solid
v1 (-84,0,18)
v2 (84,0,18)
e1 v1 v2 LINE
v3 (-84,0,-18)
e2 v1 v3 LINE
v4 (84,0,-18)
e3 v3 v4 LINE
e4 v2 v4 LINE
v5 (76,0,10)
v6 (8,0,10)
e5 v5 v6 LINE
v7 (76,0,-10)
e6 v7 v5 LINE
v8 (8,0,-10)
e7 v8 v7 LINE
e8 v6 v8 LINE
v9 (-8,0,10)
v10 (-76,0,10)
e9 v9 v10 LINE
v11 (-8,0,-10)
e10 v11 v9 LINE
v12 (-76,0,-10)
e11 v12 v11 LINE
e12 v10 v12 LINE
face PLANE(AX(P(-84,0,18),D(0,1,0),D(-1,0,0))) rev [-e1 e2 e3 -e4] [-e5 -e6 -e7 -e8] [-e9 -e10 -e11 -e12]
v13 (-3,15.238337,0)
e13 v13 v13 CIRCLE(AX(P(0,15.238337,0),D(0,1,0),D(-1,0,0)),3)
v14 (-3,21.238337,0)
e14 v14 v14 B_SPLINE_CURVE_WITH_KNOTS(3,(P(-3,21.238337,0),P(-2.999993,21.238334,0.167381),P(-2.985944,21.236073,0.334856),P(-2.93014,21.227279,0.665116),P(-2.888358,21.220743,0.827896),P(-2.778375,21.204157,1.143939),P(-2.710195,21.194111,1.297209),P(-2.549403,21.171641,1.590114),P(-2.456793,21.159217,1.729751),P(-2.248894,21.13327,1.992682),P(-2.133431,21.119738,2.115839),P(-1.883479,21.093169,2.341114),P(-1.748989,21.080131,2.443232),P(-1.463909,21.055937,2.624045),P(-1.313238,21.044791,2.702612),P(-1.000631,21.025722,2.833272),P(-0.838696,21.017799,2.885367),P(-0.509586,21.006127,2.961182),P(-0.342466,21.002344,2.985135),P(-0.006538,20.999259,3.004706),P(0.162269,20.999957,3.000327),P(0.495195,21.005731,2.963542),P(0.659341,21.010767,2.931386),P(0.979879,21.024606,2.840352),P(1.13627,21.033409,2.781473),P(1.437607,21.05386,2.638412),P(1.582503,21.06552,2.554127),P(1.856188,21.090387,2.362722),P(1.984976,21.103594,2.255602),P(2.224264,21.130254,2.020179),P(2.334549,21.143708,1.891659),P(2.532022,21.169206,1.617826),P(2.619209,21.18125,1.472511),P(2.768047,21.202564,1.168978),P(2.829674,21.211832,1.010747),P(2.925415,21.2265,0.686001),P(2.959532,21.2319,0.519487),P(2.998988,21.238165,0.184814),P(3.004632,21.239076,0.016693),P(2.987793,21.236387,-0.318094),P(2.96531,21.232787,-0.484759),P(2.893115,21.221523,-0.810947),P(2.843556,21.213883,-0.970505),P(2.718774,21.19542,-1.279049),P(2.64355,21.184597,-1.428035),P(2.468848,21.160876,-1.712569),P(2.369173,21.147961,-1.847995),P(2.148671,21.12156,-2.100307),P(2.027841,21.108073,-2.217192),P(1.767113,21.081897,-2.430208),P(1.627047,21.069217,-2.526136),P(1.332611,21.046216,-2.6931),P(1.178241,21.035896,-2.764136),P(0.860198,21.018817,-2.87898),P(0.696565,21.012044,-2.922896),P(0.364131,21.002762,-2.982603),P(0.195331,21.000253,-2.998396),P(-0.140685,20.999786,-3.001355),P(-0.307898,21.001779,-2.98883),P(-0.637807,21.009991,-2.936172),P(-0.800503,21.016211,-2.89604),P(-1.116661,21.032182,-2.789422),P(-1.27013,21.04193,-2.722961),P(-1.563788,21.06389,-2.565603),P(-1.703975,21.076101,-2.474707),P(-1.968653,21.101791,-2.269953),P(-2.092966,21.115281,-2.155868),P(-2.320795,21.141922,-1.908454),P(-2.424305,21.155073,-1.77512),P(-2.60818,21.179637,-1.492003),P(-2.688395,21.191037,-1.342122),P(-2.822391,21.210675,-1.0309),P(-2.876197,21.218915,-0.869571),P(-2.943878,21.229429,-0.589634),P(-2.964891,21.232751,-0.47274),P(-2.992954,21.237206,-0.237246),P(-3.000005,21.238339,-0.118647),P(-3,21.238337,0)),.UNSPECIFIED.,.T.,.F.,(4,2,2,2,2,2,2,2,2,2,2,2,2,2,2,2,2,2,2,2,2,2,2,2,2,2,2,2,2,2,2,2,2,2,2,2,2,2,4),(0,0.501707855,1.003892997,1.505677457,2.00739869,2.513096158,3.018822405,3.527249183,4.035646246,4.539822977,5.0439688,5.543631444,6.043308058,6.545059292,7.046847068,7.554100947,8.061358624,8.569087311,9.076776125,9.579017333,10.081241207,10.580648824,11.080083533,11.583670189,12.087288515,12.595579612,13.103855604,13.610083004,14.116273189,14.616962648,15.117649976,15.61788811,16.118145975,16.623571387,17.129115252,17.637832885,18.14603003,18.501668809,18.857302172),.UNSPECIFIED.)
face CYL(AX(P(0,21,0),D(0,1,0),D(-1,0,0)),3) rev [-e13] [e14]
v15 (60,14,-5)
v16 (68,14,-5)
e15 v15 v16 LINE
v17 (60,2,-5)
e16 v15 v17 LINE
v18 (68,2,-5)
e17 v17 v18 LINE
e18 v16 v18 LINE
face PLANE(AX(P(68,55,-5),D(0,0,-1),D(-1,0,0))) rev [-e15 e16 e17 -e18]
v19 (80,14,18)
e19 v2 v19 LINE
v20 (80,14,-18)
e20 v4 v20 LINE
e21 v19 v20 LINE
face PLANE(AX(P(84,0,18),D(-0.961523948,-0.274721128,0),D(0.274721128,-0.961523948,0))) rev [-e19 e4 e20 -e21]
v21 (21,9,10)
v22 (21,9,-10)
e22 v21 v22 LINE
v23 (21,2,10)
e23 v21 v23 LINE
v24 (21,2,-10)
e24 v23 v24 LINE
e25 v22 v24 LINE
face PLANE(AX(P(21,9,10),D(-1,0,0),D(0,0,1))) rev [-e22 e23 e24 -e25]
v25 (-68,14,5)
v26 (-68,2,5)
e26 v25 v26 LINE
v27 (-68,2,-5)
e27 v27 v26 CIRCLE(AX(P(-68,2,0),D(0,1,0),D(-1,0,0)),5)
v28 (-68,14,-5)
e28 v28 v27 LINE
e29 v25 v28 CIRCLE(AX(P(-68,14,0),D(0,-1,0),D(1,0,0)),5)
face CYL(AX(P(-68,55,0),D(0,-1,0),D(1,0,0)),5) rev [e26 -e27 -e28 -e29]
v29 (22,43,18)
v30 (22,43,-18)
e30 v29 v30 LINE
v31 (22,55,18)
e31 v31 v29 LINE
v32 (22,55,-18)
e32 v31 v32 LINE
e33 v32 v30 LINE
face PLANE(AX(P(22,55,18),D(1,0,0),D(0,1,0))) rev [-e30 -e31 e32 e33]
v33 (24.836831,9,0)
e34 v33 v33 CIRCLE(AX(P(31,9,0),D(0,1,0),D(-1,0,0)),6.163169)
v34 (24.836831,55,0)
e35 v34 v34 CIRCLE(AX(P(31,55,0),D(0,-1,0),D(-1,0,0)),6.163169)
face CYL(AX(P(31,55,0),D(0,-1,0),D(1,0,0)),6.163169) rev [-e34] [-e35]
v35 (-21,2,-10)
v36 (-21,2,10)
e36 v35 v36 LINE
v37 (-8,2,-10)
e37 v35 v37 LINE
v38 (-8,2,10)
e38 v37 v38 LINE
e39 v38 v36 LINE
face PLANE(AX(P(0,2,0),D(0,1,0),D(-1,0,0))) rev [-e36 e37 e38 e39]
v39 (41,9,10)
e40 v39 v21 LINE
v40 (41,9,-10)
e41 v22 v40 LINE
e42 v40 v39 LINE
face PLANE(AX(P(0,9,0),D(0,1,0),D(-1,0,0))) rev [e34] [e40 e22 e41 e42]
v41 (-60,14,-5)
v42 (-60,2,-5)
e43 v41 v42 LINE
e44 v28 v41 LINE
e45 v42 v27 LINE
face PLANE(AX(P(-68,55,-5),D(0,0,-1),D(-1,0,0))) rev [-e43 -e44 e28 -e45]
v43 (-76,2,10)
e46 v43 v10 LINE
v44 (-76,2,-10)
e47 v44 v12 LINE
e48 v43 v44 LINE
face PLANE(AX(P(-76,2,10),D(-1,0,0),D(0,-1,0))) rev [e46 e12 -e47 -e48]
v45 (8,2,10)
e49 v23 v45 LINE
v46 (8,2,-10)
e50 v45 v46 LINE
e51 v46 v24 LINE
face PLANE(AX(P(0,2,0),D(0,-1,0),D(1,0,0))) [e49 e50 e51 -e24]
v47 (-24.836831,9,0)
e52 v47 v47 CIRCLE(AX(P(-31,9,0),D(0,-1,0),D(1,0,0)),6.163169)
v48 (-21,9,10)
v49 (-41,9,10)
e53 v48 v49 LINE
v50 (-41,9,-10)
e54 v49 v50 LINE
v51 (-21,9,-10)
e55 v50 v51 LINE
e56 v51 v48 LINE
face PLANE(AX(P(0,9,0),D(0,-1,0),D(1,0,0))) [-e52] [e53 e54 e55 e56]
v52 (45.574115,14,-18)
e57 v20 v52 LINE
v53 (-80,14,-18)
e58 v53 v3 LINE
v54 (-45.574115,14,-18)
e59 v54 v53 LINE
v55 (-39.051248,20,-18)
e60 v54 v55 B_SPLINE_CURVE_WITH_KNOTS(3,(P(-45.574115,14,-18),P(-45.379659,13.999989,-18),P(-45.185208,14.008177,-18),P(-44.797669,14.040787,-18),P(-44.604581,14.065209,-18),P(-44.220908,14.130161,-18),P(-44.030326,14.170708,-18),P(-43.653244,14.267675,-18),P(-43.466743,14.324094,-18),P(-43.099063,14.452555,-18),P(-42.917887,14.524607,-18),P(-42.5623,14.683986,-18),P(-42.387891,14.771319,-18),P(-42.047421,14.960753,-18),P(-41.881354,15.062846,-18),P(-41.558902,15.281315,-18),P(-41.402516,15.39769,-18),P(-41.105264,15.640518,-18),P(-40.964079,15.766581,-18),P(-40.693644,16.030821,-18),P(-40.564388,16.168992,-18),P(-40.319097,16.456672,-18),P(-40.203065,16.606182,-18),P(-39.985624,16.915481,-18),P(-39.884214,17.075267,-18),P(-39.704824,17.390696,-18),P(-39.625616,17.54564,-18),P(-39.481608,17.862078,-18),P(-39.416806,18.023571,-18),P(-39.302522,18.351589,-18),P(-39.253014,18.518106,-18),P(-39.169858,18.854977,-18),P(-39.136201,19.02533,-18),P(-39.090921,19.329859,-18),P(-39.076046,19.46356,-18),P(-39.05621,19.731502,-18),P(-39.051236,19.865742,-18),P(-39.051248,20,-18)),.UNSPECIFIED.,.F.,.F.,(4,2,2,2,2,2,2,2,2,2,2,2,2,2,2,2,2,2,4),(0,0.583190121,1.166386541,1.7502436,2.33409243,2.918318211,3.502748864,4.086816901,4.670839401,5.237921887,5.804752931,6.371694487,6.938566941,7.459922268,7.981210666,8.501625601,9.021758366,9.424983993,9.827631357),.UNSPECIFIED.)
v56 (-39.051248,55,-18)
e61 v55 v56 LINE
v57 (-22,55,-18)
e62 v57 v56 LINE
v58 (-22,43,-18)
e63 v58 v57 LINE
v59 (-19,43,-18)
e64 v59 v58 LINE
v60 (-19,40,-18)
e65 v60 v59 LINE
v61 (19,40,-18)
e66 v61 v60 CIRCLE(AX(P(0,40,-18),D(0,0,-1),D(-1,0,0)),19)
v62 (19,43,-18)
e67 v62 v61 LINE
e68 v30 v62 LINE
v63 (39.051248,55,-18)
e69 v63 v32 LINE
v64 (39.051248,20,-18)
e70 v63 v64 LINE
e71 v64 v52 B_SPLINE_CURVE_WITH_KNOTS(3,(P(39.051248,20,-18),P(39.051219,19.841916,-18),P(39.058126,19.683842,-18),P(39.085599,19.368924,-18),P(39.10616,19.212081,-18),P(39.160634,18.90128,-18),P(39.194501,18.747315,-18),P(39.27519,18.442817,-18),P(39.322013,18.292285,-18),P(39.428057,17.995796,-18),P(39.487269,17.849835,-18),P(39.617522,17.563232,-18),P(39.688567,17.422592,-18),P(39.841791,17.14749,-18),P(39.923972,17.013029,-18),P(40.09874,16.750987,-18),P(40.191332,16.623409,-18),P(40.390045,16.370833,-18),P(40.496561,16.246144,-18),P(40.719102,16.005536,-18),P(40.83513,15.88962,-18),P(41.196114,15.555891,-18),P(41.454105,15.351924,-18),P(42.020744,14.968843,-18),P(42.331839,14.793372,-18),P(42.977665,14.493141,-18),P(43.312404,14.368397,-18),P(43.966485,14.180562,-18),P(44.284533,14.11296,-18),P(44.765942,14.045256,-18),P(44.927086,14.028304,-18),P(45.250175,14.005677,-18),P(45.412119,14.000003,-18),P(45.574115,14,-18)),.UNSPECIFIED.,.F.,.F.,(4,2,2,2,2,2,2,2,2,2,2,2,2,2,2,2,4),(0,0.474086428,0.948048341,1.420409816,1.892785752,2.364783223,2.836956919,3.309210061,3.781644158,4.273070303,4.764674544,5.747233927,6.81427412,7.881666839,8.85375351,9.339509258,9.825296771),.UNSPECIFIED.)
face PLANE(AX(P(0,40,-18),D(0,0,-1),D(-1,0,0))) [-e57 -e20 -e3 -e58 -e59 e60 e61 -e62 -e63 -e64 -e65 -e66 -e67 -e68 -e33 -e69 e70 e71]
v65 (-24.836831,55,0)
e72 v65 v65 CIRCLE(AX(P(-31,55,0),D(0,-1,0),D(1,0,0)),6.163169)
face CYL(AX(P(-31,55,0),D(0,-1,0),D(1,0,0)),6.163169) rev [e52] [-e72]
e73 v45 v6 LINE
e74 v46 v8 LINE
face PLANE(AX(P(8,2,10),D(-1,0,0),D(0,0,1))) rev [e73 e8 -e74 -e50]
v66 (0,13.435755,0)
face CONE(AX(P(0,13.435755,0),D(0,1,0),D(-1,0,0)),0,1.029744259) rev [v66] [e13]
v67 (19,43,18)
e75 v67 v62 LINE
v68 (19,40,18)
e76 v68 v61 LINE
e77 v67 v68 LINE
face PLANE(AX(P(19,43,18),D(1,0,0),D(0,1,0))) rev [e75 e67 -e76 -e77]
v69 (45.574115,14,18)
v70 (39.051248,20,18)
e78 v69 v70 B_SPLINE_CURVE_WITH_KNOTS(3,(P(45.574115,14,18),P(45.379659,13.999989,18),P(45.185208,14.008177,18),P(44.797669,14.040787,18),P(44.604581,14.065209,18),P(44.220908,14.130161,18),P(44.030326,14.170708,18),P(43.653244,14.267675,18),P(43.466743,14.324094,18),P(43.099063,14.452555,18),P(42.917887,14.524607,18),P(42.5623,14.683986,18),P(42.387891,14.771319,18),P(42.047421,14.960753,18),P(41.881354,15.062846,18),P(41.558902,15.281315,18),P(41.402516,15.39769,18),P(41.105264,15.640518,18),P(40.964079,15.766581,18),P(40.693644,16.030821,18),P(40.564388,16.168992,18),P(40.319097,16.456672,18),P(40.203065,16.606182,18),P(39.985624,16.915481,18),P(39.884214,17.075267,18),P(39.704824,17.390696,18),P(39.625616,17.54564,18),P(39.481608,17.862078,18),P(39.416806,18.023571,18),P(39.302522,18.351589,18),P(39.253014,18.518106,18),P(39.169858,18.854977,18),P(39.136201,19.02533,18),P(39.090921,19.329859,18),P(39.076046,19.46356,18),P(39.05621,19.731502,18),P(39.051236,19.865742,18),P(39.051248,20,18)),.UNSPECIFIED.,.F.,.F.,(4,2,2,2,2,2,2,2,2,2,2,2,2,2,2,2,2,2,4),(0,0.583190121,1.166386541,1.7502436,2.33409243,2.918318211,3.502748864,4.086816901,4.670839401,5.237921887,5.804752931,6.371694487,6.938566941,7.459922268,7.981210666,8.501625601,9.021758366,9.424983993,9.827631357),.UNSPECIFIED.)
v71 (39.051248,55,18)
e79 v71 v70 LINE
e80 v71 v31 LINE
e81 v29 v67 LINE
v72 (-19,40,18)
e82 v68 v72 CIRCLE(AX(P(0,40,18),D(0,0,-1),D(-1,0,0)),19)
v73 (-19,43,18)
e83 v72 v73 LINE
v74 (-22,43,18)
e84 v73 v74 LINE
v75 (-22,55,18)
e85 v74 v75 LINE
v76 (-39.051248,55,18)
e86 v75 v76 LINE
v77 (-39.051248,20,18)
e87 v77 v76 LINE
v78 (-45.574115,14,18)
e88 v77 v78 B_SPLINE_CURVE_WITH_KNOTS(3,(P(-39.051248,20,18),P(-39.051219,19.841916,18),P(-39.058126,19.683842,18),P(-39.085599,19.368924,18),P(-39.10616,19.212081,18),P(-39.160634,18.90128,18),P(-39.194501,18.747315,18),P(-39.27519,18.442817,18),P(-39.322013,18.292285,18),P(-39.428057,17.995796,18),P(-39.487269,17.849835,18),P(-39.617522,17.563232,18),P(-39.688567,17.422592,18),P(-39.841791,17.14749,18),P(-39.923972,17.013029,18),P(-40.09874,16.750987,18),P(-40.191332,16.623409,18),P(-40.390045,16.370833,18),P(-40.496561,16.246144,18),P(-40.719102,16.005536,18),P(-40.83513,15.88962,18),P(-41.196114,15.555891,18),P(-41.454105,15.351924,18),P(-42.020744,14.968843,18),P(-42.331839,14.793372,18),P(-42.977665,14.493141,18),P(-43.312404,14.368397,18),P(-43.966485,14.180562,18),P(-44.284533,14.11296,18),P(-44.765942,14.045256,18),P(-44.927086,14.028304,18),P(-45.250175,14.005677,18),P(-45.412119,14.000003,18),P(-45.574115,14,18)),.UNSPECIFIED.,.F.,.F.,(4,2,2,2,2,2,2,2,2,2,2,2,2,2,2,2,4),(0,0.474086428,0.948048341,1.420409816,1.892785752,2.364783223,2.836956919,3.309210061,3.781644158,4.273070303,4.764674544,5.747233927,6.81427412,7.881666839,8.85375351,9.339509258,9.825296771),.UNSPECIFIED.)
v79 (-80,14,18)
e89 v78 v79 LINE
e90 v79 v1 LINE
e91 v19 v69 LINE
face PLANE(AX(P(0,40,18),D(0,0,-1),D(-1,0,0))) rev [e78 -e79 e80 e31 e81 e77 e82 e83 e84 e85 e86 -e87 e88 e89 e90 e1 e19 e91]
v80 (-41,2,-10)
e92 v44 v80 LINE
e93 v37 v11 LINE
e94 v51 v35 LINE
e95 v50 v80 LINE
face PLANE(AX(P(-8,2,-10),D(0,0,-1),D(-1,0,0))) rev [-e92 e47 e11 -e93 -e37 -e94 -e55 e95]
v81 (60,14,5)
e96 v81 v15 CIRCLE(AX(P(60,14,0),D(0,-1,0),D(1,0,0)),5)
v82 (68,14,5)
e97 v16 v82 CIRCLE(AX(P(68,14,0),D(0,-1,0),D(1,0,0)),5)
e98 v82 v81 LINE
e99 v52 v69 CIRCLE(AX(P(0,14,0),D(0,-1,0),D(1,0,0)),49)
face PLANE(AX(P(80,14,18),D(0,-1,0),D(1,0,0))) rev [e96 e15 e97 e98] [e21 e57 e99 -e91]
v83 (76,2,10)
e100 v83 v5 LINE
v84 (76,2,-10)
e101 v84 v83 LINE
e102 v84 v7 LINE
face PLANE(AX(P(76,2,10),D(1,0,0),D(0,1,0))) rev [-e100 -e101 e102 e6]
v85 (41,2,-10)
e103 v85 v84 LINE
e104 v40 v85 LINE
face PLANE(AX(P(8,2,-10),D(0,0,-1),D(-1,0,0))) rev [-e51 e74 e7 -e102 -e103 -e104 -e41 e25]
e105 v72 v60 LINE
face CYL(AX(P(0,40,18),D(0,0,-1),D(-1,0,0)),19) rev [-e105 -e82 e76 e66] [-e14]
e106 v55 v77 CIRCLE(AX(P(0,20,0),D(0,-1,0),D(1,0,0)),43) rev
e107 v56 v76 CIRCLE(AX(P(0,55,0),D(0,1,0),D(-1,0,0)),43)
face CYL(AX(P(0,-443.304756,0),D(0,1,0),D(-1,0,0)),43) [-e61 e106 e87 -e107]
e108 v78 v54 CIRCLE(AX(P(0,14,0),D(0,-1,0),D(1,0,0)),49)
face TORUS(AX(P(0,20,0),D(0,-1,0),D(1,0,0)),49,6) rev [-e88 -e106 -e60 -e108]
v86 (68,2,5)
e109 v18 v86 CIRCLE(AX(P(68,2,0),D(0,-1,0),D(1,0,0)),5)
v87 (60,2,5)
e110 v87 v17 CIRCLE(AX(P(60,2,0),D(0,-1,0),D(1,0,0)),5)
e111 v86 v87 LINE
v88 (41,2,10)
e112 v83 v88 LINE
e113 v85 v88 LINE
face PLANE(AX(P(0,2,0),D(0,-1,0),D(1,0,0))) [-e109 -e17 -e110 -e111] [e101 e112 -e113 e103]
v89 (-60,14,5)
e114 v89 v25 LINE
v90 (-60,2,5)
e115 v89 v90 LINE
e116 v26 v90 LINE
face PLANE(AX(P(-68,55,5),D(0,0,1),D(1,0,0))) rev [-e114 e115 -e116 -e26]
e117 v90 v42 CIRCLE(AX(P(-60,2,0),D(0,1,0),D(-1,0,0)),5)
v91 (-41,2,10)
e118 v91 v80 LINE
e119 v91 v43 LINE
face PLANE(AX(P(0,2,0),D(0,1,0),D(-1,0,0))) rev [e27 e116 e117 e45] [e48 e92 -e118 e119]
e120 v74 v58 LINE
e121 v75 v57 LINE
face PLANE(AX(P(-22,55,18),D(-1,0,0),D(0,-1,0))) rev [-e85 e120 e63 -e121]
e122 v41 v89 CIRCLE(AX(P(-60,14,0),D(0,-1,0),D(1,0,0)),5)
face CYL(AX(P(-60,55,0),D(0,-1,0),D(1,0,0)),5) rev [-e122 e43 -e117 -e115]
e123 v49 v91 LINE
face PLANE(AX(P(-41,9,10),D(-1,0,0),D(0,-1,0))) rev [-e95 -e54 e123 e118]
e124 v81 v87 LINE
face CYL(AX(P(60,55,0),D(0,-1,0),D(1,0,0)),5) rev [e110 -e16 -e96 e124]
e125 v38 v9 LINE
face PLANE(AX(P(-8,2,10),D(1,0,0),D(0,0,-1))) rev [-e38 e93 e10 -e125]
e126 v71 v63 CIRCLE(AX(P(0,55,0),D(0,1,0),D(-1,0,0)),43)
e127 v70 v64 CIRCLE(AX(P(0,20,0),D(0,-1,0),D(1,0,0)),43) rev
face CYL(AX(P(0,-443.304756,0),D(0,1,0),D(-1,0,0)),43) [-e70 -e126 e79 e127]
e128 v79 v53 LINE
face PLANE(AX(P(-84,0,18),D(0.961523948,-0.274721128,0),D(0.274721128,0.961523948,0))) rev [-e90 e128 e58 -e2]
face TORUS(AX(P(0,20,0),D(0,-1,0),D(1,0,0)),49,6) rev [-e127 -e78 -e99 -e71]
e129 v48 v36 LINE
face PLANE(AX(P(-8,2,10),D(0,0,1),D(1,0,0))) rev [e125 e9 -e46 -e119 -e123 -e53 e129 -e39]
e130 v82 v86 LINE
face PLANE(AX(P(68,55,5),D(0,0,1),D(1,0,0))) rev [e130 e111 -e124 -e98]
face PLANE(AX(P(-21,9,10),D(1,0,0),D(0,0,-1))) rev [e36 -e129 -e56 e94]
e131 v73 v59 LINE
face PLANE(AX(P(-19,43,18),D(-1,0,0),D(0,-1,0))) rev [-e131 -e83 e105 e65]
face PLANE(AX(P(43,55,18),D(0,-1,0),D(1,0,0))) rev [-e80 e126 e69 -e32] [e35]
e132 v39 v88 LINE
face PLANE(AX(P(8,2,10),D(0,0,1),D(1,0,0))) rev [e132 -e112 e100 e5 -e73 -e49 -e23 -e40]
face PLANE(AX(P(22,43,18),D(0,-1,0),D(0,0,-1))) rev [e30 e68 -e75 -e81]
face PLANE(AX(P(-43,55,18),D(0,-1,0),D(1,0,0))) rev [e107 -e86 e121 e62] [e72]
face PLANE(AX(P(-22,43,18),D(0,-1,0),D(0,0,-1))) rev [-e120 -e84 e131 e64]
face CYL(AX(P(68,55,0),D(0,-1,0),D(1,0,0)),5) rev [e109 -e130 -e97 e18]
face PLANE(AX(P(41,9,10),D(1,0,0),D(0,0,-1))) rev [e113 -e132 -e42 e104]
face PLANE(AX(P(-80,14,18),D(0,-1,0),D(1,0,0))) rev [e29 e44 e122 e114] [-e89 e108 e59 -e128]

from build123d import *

# Parameters (mm, degrees)
BOSS_EXTRUDE1_DEPTH = 18
SKETCH2_W           = 68
SKETCH2_H           = 20
CUT_EXTRUDE2_DEPTH  = 2
SKETCH4_W           = 20
SKETCH4_H           = 20
CUT_EXTRUDE3_DEPTH  = 7
SKETCH5_R           = 6.163168956
CUT_EXTRUDE4_DEPTH  = 103.004901843
CUT_EXTRUDE5_START  = -41
CUT_EXTRUDE5_DEPTH  = 41
FILLET1_R           = 6


with BuildPart() as part:
    # Sketch1 → Boss-Extrude1 (new, symmetric)
    with BuildSketch(Plane.XY):
        with BuildLine():
            Line((-84, 0), (84, 0))
            Line((84, 0), (80, 14))
            Line((80, 14), (43, 14))
            Line((43, 14), (43, 55))
            Line((43, 55), (22, 55))
            Line((22, 55), (22, 43))
            Line((22, 43), (19, 43))
            Line((19, 43), (19, 40))
            ThreePointArc((19, 40), (0, 21), (-19, 40))
            Line((-19, 40), (-19, 43))
            Line((-19, 43), (-22, 43))
            Line((-22, 43), (-22, 55))
            Line((-22, 55), (-43, 55))
            Line((-43, 55), (-43, 14))
            Line((-43, 14), (-80, 14))
            Line((-80, 14), (-84, 0))
        make_face()
    extrude(amount=BOSS_EXTRUDE1_DEPTH, both=True)

    # Sketch2 → Cut-Extrude2 (cut)
    with BuildSketch(Plane.XZ):
        with Locations((-42, 0)):
            Rectangle(SKETCH2_W, SKETCH2_H)
        with Locations((42, 0)):
            Rectangle(SKETCH2_W, SKETCH2_H)
    extrude(amount=-CUT_EXTRUDE2_DEPTH, mode=Mode.SUBTRACT)

    # Sketch4 → Cut-Extrude3 (cut)
    with BuildSketch(Plane.XZ.offset(-2)):
        with Locations((-31, 0)):
            Rectangle(SKETCH4_W, SKETCH4_H)
        with Locations((31, 0)):
            Rectangle(SKETCH4_W, SKETCH4_H)
    extrude(amount=-CUT_EXTRUDE3_DEPTH, mode=Mode.SUBTRACT)

    # Sketch5 → Cut-Extrude4 (cut, through all)
    with BuildSketch(Plane.XZ):
        with Locations((-31, 0)):
            Circle(SKETCH5_R)
        with Locations(Location((31, 0, 0), (0, 0, 180))):
            Circle(SKETCH5_R)
        with BuildLine():
            Line((-68, 5), (-60, 5))
            ThreePointArc((-60, 5), (-55, 0), (-60, -5))
            Line((-60, -5), (-68, -5))
            ThreePointArc((-68, -5), (-73, 0), (-68, 5))
        make_face()
        with BuildLine():
            Line((68, 5), (60, 5))
            ThreePointArc((60, 5), (55, 0), (60, -5))
            Line((60, -5), (68, -5))
            ThreePointArc((68, -5), (73, 0), (68, 5))
        make_face()
    extrude(amount=-CUT_EXTRUDE4_DEPTH, mode=Mode.SUBTRACT)

    # Cut-Extrude5: read off the stored shape, not the designer's step
    # Cut-Extrude5 outline → Cut-Extrude5 (cut)
    with BuildSketch(Plane(origin=(0, 55, 0), x_dir=(1, 0, 0), z_dir=(0, 1, 0)).offset(CUT_EXTRUDE5_START)):
        with BuildLine():
            ThreePointArc((-43, 0), (-42.001212365, 9.214019744), (-39.05124838, 18))
            Line((-39.05124838, 18), (-43, 18))
            Line((-43, 18), (-43, 0))
        make_face()
        with BuildLine():
            ThreePointArc((-39.05124838, -18), (-42.001212365, -9.214019744), (-43, 0))
            Line((-43, 0), (-43, -18))
            Line((-43, -18), (-39.05124838, -18))
        make_face()
        with BuildLine():
            Line((43, 18), (39.05124838, 18))
            ThreePointArc((39.05124838, 18), (42.001212365, 9.214019744), (43, 0))
            Line((43, 0), (43, 18))
        make_face()
        with BuildLine():
            Line((43, -18), (43, 0))
            ThreePointArc((43, 0), (42.001212365, -9.214019744), (39.05124838, -18))
            Line((39.05124838, -18), (43, -18))
        make_face()
    extrude(amount=CUT_EXTRUDE5_DEPTH, mode=Mode.SUBTRACT)

    # Fillet1
    fillet1_edges = [part.edges().sort_by_distance(p)[0] for p in [
        (-42.001212365, 14, 9.214019744),
        (42.001212365, 14, -9.214019744),
    ]]
    fillet(fillet1_edges, radius=FILLET1_R)

    # Cut-Revolve1: read off the stored shape, not the designer's step
    # Cut-Revolve1 outline → Cut-Revolve1 (revolve, cut)
    with BuildSketch(Plane.XY):
        Polygon((0, 13.435755104), (3, 15.238336961), (3, 21.238467133), (0, 21.238467133), align=None)
    revolve(axis=Axis((0, 0, 0), (0, 1, 0)), mode=Mode.SUBTRACT)


solid = part.part
